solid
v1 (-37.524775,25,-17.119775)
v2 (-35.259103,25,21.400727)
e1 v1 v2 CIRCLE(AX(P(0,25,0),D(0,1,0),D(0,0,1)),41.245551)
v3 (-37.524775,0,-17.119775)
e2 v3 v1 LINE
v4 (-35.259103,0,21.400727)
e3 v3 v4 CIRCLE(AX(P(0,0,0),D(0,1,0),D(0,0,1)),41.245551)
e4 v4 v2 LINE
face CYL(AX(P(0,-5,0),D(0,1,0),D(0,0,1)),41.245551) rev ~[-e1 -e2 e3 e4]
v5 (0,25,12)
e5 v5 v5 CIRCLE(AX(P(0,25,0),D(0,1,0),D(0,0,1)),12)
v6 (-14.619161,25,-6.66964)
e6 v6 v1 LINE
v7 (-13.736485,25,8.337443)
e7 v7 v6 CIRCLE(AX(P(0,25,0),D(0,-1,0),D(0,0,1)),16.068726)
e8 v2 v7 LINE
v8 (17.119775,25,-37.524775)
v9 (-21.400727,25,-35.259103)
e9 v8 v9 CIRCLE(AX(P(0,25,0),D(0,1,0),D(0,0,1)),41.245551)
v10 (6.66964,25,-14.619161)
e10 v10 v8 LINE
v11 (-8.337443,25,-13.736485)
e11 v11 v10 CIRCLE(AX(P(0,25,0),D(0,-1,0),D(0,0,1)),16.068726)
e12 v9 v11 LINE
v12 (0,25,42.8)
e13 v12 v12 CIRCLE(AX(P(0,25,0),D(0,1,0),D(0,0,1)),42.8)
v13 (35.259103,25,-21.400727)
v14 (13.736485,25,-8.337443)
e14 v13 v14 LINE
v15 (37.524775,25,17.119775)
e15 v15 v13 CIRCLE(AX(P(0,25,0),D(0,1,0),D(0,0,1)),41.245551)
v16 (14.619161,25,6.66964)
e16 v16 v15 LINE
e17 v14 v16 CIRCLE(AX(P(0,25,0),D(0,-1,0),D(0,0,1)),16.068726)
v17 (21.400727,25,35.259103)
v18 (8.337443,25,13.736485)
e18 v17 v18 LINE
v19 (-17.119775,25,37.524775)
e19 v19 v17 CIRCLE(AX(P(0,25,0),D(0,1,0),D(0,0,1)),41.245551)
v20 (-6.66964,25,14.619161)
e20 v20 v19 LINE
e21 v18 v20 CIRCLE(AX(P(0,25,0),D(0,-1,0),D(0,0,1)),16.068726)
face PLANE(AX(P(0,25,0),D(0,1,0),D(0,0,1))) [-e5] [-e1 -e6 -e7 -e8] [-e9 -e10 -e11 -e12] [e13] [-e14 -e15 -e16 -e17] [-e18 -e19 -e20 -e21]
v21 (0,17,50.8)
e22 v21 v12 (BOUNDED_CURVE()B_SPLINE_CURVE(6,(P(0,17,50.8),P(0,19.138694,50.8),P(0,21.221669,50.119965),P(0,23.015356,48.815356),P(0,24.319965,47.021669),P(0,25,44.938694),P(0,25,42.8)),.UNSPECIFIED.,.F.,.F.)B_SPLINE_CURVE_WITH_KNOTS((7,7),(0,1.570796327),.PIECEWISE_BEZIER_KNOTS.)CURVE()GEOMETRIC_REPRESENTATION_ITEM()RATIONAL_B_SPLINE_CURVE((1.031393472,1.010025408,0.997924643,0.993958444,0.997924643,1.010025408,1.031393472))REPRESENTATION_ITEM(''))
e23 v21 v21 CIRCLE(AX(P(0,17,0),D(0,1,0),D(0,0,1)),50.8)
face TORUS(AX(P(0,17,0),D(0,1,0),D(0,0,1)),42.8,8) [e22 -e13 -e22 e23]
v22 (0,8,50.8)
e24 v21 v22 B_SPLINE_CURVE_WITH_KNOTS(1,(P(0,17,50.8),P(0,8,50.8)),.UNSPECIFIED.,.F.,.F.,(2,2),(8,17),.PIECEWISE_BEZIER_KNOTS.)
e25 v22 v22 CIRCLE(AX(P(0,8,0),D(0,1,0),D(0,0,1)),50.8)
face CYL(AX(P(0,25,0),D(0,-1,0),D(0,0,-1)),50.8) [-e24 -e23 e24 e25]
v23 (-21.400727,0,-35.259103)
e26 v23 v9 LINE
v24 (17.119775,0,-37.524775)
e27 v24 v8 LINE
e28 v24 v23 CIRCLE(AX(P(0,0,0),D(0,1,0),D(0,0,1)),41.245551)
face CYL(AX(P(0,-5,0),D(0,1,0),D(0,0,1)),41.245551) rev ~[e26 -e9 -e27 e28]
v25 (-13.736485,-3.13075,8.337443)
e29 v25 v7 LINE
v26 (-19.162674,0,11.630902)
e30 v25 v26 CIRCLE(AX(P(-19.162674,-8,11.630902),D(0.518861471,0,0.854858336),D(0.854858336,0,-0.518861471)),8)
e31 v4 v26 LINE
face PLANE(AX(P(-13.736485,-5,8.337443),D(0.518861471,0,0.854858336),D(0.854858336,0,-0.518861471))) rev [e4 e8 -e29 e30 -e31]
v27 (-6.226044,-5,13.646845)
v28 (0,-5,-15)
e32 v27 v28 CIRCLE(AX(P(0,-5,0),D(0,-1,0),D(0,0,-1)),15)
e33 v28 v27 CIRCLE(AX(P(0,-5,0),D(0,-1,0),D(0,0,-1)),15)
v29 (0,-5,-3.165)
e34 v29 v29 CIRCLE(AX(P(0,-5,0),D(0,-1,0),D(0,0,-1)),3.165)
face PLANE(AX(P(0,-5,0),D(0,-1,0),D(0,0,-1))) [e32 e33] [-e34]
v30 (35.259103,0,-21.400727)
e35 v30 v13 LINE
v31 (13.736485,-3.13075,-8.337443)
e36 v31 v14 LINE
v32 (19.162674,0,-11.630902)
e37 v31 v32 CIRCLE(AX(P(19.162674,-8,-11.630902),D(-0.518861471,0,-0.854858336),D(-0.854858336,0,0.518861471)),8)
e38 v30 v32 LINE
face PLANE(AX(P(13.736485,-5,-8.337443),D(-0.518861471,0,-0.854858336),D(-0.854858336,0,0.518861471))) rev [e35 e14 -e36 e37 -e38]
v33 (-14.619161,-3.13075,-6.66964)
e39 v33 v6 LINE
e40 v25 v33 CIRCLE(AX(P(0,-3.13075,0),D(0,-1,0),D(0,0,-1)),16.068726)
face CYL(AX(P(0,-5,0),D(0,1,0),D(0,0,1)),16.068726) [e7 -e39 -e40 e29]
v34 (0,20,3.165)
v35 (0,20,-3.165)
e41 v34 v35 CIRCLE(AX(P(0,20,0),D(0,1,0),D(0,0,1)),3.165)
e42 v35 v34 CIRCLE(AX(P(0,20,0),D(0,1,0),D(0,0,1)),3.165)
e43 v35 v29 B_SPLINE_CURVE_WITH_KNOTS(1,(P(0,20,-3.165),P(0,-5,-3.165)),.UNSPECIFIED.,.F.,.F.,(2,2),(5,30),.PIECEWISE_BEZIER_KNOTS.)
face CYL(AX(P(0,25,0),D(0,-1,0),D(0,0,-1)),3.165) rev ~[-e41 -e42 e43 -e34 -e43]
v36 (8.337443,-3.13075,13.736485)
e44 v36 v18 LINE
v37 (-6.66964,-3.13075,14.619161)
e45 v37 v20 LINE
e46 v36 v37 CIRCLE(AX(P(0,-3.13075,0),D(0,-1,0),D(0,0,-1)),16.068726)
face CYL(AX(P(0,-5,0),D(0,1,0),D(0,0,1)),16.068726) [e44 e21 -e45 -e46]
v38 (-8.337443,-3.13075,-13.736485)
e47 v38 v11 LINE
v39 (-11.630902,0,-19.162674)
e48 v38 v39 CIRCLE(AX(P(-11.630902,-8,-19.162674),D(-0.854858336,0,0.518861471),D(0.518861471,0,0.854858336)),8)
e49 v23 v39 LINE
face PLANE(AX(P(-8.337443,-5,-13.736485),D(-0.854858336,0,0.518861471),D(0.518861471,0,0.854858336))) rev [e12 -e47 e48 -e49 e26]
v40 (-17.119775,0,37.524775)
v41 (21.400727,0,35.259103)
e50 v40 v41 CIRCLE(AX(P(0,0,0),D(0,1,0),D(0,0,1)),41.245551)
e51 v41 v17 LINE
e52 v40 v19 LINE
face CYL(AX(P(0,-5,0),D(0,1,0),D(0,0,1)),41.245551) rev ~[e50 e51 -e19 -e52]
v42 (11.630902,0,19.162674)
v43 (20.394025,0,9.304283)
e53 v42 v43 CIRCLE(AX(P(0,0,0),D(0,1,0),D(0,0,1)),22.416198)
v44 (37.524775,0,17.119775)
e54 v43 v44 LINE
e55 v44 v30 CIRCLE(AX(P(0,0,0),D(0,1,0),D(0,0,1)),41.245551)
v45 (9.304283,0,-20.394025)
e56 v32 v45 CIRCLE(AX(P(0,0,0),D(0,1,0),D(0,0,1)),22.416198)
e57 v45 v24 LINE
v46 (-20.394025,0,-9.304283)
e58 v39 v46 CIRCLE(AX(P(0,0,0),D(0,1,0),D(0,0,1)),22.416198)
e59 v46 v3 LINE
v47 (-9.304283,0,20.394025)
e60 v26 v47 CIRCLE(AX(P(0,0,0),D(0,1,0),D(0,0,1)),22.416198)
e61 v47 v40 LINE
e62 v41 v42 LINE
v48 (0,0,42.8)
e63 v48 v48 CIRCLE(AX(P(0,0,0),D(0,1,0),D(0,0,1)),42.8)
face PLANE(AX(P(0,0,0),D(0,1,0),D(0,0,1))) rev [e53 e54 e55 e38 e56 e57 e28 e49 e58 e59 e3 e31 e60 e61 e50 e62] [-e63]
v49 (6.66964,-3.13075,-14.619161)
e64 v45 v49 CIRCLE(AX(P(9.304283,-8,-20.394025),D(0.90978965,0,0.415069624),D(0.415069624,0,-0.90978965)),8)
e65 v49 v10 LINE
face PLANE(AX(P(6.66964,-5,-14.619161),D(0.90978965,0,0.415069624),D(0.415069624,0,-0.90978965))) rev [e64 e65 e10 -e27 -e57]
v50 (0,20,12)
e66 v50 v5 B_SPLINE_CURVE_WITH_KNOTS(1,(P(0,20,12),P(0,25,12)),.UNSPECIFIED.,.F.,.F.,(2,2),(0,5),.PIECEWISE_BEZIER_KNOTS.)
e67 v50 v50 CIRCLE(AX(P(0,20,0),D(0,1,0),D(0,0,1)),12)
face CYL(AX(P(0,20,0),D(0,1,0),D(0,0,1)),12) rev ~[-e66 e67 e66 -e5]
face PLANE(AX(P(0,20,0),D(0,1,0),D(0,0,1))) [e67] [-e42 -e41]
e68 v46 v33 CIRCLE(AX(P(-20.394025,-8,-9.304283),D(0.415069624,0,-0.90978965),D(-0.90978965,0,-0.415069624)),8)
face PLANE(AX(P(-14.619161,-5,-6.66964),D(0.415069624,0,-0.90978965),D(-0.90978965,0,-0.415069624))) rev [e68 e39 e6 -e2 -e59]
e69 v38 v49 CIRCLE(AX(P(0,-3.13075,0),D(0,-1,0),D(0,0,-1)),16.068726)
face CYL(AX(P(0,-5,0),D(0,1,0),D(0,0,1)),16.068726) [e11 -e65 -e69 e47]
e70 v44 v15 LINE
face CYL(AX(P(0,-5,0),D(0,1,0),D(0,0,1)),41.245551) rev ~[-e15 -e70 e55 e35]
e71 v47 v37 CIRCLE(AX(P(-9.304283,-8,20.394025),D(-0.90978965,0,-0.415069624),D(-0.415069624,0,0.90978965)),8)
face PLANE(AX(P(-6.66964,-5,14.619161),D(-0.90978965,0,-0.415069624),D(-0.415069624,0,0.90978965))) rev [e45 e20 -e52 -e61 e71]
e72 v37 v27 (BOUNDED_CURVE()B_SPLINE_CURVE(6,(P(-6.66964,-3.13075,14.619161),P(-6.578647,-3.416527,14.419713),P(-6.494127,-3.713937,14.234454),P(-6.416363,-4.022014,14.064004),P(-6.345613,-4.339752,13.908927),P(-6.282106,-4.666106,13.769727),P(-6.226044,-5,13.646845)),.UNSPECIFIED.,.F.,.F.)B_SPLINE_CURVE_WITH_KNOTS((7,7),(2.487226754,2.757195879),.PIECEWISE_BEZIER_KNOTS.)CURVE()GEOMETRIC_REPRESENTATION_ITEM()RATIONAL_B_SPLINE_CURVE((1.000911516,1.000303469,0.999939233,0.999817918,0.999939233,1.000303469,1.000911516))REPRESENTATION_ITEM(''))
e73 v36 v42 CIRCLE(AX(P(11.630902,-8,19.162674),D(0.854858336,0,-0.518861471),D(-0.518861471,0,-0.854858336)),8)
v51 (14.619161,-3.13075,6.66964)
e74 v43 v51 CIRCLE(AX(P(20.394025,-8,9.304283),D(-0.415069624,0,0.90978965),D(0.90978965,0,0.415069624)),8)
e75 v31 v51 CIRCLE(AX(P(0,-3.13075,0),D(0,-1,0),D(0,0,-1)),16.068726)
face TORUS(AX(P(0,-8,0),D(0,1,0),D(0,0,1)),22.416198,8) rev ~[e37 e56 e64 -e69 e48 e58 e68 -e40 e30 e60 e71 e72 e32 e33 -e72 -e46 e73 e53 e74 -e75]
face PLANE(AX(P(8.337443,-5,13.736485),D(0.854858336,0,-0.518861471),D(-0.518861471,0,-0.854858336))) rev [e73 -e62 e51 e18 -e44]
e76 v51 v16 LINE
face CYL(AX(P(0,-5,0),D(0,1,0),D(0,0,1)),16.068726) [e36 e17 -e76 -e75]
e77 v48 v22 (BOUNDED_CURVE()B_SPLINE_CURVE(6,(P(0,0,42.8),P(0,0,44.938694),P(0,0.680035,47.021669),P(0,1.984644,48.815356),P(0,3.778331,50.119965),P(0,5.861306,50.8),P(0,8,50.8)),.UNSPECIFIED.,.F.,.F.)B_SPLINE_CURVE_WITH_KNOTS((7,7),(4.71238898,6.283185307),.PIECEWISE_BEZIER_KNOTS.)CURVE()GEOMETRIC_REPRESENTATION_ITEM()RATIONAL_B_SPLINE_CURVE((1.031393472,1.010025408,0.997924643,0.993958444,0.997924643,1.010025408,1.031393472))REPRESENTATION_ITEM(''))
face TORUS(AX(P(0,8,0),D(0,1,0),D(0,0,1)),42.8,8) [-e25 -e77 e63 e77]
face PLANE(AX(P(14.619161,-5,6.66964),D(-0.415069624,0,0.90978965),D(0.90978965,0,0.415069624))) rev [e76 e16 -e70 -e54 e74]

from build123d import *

# Parameters (mm, degrees)
SKETCH1_R           = 50.8
BOSS_EXTRUDE1_DEPTH = 25
FILLET2_R           = 8
FILLET3_R           = 8
SKETCH2_R           = 15
BOSS_EXTRUDE2_DEPTH = 5
SKETCH3_R           = 12
CUT_EXTRUDE1_DEPTH  = 5
FILLET4_R           = 8
SKETCH5_R           = 3.165
CUT_EXTRUDE2_DEPTH  = 78.85422275
CUT_EXTRUDE3_DEPTH  = 78.85422275


with BuildPart() as part:
    # Sketch1 → Boss-Extrude1 (new body)
    with BuildSketch(Plane(origin=(0, 0, 0), x_dir=(1, 0, 0), z_dir=(0, 1, 0))):
        with Locations(Location((0, 0, 0), (0, 0, 270))):
            Circle(SKETCH1_R)
    extrude(amount=BOSS_EXTRUDE1_DEPTH)

    # Fillet2
    fillet2_edges = [part.edges().sort_by_distance(p)[0] for p in [
        (0, 25, -50.8),
    ]]
    fillet(fillet2_edges, radius=FILLET2_R)

    # Fillet3
    fillet3_edges = [part.edges().sort_by_distance(p)[0] for p in [
        (0, 0, -50.8),
    ]]
    fillet(fillet3_edges, radius=FILLET3_R)

    # Sketch2 → Boss-Extrude2 (add)
    with BuildSketch(Plane.XZ):
        with Locations(Location((0, 0, 0), (0, 0, 90))):
            Circle(SKETCH2_R)
    extrude(amount=BOSS_EXTRUDE2_DEPTH)

    # Sketch3 → Cut-Extrude1 (cut)
    with BuildSketch(Plane(origin=(0, 25, 0), x_dir=(1, 0, 0), z_dir=(0, 1, 0))):
        with Locations(Location((0, 0, 0), (0, 0, 270))):
            Circle(SKETCH3_R)
    extrude(amount=-CUT_EXTRUDE1_DEPTH, mode=Mode.SUBTRACT)

    # Fillet4
    # the kernel refuses this fillet: 8 mm, written as the material it adds along each edge
    with BuildSketch(Plane(origin=(0, 0, 0), x_dir=(0, 0, 1), z_dir=(1, 0, 0))) as fillet4_piece_1:
        with BuildLine():
            CenterArc((22.416198487, 8), FILLET4_R, 202.024312837, 67.975687163)
            Line((15, 5), (14.85167603, 4.94))
            ThreePointArc((14.85167603, 4.94), (14.84, 2.5), (14.84, 0))
            Line((14.84, 0), (15, -0.16))
            Line((15, -0.16), (22.416198487, -0.16))
            Line((22.416198487, -0.16), (22.416198487, 0))
        make_face()
    revolve(axis=Axis((0, 0, 0), (0, -1, 0)))

    # Sketch5 → Cut-Extrude2 (cut, through all)
    with BuildSketch(Plane.XZ.offset(5)):
        with Locations(Location((0, 0, 0), (0, 0, 270))):
            Circle(SKETCH5_R)
    extrude(amount=-CUT_EXTRUDE2_DEPTH, mode=Mode.SUBTRACT)

    # Sketch6 → Cut-Extrude3 (cut, through all)
    with BuildSketch(Plane(origin=(0, 25, 0), x_dir=(1, 0, 0), z_dir=(0, 1, 0))):
        with BuildLine():
            Line((6.669640143, 14.619160774), (17.119775233, 37.524775128))
            ThreePointArc((17.119775233, 37.524775128), (-2.42176691, 41.174391282), (-21.4007271, 35.259102825))
            Line((-21.4007271, 35.259102825), (-8.337442905, 13.736484528))
            ThreePointArc((-8.337442905, 13.736484528), (-0.943488661, 16.041003414), (6.669640143, 14.619160774))
        make_face()
        with BuildLine():
            Line((13.736484528, 8.337442905), (35.259102825, 21.4007271))
            ThreePointArc((35.259102825, 21.4007271), (41.174391282, 2.42176691), (37.524775128, -17.119775233))
            Line((37.524775128, -17.119775233), (14.619160774, -6.669640143))
            ThreePointArc((14.619160774, -6.669640143), (16.041003414, 0.943488661), (13.736484528, 8.337442905))
        make_face()
        with BuildLine():
            Line((8.337442905, -13.736484528), (21.4007271, -35.259102825))
            ThreePointArc((21.4007271, -35.259102825), (2.42176691, -41.174391282), (-17.119775233, -37.524775128))
            Line((-17.119775233, -37.524775128), (-6.669640143, -14.619160774))
            ThreePointArc((-6.669640143, -14.619160774), (0.943488661, -16.041003414), (8.337442905, -13.736484528))
        make_face()
        with BuildLine():
            Line((-13.736484528, -8.337442905), (-35.259102825, -21.4007271))
            ThreePointArc((-35.259102825, -21.4007271), (-41.174391282, -2.42176691), (-37.524775128, 17.119775233))
            Line((-37.524775128, 17.119775233), (-14.619160774, 6.669640143))
            ThreePointArc((-14.619160774, 6.669640143), (-16.041003414, -0.943488661), (-13.736484528, -8.337442905))
        make_face()
    extrude(amount=-CUT_EXTRUDE3_DEPTH, mode=Mode.SUBTRACT)


solid = part.part
